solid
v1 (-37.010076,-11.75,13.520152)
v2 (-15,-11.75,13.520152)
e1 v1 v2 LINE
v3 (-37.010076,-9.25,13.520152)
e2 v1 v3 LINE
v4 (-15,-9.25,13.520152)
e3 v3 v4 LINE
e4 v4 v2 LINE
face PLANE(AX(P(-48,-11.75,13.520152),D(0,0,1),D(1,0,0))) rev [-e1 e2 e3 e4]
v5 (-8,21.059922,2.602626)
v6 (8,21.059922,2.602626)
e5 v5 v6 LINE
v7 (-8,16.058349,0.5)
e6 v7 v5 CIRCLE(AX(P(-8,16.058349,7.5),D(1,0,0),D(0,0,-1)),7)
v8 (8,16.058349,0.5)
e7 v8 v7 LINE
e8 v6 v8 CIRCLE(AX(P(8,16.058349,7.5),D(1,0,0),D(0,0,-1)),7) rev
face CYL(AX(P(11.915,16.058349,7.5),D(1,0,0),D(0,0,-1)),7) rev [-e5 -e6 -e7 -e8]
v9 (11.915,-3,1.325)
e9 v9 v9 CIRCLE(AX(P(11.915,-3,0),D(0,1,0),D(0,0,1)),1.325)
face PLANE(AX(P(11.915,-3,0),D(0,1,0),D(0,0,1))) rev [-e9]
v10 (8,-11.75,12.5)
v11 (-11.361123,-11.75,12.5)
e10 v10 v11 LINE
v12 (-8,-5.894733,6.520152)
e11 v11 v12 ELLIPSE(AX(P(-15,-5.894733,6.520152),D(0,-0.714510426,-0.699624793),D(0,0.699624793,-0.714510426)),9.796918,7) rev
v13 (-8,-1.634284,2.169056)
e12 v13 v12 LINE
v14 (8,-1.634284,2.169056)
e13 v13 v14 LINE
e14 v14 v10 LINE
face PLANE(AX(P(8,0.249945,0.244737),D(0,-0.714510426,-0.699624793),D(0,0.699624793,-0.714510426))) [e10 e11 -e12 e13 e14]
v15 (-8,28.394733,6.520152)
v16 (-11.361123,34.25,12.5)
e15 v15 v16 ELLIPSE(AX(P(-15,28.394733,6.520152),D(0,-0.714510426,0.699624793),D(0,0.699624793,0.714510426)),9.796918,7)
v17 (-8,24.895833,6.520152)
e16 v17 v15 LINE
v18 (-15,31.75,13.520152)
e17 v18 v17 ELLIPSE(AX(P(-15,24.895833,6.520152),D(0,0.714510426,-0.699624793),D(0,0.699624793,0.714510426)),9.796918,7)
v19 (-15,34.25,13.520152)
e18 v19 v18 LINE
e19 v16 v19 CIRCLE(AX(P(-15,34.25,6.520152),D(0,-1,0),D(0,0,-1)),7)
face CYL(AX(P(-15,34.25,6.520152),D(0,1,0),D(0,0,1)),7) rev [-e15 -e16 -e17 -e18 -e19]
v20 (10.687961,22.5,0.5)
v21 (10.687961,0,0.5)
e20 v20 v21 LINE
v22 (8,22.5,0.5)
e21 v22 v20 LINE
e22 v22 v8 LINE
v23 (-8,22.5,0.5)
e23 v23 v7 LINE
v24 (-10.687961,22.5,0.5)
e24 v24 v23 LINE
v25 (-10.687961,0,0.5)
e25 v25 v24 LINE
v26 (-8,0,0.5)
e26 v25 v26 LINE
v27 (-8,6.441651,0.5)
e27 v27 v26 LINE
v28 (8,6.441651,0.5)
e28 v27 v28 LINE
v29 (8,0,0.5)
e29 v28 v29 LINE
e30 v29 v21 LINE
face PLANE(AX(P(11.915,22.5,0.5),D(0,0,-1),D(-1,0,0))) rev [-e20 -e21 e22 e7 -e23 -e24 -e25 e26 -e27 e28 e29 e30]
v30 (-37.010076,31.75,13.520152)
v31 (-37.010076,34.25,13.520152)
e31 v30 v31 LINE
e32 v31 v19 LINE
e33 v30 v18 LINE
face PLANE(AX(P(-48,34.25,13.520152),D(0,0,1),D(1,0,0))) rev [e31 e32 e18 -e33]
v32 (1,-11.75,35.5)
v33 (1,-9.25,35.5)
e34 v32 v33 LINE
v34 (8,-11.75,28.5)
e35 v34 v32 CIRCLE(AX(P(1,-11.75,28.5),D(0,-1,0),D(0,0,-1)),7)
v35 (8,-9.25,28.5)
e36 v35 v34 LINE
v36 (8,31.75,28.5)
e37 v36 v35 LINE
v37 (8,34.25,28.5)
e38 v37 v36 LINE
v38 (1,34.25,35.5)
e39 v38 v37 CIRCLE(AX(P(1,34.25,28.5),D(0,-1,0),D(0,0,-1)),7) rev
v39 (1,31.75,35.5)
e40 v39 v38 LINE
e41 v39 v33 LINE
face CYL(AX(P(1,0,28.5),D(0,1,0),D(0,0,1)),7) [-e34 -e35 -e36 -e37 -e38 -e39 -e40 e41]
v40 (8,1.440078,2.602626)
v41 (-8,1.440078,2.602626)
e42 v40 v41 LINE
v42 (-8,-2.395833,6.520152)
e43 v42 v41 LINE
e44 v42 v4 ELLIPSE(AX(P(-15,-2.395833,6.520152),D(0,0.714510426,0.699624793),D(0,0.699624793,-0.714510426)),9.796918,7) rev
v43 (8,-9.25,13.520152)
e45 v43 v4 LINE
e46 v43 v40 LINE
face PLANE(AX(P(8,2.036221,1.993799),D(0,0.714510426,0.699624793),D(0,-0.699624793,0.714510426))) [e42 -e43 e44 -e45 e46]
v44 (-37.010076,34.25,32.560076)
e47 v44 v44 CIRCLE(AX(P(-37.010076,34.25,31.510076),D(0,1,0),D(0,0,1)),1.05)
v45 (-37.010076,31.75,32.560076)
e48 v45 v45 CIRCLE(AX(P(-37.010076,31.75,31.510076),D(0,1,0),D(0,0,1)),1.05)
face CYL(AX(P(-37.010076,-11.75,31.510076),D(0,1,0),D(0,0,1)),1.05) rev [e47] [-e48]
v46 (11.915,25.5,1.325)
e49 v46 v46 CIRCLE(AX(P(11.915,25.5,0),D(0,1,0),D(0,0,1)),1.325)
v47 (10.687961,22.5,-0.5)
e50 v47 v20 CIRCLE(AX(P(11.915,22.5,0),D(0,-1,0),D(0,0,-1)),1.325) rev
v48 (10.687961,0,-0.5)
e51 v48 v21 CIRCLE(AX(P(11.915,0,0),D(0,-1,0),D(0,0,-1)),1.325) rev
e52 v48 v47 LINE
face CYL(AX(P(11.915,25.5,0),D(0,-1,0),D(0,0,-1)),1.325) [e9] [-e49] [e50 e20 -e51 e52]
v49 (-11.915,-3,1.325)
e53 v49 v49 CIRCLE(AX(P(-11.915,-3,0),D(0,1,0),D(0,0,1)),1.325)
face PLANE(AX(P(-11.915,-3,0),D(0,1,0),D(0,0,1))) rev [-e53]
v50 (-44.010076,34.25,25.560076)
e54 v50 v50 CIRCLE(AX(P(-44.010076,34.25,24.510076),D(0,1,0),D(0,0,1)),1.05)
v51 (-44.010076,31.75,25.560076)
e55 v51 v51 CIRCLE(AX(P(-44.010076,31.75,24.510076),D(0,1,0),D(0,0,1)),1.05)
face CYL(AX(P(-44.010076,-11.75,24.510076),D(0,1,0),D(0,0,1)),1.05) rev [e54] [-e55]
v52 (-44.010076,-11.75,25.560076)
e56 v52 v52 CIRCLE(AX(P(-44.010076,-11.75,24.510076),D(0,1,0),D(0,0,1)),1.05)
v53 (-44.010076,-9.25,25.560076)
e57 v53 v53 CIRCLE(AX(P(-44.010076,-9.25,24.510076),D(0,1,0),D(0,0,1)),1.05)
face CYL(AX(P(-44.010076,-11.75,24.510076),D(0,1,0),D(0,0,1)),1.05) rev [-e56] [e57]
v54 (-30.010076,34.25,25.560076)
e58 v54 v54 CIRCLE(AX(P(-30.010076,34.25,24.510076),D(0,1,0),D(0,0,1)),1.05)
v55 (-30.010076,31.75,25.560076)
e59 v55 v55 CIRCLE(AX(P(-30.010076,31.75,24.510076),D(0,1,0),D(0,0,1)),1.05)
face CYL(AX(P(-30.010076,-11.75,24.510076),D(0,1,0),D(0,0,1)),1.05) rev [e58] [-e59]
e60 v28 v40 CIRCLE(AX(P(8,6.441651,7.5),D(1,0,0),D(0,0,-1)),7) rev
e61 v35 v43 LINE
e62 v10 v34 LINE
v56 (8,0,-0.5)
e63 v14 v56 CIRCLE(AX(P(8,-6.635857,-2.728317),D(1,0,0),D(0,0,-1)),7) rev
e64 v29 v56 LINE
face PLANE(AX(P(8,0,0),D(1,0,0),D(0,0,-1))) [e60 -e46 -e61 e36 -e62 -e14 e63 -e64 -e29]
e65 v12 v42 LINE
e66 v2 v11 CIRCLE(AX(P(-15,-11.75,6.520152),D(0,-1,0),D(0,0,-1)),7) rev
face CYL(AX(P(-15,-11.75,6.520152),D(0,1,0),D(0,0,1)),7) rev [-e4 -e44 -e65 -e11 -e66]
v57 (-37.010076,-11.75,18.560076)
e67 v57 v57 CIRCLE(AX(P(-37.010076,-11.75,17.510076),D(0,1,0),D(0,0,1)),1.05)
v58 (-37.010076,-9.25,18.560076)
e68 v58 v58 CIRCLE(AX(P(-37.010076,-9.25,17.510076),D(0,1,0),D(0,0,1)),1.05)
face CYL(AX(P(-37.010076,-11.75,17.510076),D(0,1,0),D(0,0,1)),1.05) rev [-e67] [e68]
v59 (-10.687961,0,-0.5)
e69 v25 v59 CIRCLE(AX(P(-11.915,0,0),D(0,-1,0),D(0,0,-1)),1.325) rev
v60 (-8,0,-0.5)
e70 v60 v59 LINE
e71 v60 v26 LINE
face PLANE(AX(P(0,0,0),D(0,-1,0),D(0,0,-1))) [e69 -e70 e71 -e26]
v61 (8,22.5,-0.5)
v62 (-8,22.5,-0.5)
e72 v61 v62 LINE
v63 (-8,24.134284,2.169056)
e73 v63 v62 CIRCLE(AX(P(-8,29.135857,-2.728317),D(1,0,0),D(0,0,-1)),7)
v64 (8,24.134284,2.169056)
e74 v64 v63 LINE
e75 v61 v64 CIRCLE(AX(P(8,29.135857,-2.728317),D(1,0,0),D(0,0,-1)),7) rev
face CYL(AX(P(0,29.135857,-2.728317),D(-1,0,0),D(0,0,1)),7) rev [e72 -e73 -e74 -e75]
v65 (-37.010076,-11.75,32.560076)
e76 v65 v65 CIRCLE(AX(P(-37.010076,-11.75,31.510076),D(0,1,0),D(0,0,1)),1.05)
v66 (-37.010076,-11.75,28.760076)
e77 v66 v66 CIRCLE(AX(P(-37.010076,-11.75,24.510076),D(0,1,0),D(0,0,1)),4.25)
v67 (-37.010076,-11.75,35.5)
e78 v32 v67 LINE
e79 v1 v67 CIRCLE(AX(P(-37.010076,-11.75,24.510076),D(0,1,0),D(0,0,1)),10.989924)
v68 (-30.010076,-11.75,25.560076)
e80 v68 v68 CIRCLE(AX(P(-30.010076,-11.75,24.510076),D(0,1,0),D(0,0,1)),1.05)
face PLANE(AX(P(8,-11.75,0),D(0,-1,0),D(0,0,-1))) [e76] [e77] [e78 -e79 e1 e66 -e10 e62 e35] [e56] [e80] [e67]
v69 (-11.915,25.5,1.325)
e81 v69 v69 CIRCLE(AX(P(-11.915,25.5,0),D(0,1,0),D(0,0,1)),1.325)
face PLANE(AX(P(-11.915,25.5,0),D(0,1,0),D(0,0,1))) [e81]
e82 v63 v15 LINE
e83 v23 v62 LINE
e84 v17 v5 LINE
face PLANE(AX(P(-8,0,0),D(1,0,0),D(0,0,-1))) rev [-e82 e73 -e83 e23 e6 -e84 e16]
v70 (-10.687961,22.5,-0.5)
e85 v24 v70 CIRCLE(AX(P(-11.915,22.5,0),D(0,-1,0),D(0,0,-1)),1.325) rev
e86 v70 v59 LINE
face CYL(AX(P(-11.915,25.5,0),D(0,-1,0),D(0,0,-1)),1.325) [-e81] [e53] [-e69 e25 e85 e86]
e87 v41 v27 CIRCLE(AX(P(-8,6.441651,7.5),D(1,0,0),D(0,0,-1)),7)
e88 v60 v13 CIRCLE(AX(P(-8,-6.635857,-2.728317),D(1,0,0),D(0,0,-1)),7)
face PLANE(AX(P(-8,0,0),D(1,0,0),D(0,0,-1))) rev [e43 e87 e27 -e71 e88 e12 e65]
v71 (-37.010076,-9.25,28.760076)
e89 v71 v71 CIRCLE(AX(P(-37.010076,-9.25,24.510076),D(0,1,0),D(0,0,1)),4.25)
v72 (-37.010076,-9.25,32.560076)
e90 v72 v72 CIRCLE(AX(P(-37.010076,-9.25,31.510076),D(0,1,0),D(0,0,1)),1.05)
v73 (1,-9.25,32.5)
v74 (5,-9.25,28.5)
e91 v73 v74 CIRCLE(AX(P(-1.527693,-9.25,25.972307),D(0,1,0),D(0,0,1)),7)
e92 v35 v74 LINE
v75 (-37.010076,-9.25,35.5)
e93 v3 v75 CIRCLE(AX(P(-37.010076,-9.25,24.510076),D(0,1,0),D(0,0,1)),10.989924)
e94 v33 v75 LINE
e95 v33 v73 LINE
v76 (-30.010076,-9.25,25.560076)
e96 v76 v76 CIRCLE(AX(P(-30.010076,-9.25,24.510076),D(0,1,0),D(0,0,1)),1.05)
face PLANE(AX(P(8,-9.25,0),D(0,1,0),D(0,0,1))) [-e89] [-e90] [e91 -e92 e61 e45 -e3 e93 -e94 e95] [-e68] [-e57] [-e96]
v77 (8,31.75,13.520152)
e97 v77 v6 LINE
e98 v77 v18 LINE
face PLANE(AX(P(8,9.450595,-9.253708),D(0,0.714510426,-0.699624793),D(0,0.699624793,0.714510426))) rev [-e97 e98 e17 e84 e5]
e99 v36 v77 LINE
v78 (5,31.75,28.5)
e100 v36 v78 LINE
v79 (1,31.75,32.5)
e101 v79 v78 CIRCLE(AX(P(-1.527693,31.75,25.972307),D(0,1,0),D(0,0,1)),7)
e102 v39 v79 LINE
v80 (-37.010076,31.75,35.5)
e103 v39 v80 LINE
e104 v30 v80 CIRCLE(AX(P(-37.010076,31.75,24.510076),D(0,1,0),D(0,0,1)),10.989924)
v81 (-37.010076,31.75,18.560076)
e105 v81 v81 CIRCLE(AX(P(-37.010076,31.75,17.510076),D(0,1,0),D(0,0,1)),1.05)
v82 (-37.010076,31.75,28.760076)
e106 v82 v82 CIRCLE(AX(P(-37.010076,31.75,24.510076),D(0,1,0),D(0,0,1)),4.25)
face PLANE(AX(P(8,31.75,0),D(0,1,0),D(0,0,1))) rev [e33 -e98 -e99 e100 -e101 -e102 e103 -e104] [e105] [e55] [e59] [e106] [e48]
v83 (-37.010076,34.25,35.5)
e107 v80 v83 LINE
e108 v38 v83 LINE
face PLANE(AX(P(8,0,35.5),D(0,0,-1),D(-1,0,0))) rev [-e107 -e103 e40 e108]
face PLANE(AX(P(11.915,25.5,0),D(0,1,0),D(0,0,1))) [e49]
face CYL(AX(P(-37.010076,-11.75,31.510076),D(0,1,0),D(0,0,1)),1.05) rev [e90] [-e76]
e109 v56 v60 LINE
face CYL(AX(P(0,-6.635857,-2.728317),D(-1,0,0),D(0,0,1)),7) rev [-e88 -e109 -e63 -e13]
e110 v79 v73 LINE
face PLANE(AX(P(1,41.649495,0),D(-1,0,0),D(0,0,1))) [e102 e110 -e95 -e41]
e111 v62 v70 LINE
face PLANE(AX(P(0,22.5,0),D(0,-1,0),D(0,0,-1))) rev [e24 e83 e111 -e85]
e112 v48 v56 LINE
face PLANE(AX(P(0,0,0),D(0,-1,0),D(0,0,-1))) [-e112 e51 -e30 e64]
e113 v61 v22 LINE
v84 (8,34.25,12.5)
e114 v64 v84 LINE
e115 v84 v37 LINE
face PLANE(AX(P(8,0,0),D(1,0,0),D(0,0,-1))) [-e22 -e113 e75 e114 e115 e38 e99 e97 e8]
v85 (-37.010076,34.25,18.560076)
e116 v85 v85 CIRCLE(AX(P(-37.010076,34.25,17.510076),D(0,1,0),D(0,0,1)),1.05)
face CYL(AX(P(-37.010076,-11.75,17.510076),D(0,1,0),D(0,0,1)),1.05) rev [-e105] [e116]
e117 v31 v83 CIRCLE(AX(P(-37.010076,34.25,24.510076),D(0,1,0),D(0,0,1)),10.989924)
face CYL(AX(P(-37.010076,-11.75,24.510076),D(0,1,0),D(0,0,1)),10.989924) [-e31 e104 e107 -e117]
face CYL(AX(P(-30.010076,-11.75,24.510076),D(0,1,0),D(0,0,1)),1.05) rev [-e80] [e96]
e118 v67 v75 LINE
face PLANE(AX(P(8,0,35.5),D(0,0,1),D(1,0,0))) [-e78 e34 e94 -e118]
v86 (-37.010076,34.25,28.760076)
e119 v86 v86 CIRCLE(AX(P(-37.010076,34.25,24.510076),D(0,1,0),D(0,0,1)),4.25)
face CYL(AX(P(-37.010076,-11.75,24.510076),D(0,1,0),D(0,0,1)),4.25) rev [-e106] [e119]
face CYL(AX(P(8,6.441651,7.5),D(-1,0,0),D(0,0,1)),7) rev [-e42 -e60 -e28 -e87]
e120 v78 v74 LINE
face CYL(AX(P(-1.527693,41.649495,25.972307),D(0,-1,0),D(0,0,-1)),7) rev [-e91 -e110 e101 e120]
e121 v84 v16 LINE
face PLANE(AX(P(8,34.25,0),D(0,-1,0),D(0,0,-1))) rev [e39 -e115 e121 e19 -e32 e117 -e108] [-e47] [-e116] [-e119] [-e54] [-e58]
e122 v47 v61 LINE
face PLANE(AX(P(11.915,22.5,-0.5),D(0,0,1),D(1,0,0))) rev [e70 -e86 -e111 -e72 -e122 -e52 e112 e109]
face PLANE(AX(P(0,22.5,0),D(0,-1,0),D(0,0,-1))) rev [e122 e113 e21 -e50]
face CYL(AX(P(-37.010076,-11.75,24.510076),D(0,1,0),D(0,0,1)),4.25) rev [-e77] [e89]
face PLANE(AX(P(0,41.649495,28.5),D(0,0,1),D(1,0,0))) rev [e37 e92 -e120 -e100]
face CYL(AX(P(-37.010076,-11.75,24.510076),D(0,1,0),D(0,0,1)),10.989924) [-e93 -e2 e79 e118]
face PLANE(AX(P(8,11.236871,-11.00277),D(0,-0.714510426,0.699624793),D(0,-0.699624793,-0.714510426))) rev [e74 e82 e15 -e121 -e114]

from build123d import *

# Parameters (mm, degrees)
SKETCH1_W           = 23.83
SKETCH1_H           = 1
BOSS_EXTRUDE1_DEPTH = 22.5
SKETCH2_R           = 1.325
BOSS_EXTRUDE2_DEPTH = 14.25
BOSS_EXTRUDE4_DEPTH = 8
SKETCH5_W           = 21.979847568
SKETCH5_H           = 2.5
BOSS_EXTRUDE5_DEPTH = 40
SKETCH6_R           = 4.25
SKETCH6_R_2         = 1.05
CUT_EXTRUDE1_DEPTH  = 76.367433285
FILLET1_R           = 7
FILLET2_R           = 7
FILLET3_R           = 7
BOSS_EXTRUDE6_START = 41
BOSS_EXTRUDE6_DEPTH = 41


with BuildPart() as part:
    # Sketch1 → Boss-Extrude1 (new body)
    with BuildSketch(Plane(origin=(0, 0, 0), x_dir=(1, 0, 0), z_dir=(0, 1, 0))):
        Rectangle(SKETCH1_W, SKETCH1_H)
    extrude(amount=BOSS_EXTRUDE1_DEPTH)

    # Sketch2 → Boss-Extrude2 (add, symmetric)
    with BuildSketch(Plane(origin=(0, 11.25, 0), x_dir=(1, 0, 0), z_dir=(0, 1, 0))):
        with Locations(Location((-11.915, 0, 0), (0, 0, 270))):
            Circle(SKETCH2_R)
        with Locations(Location((11.915, 0, 0), (0, 0, 270))):
            Circle(SKETCH2_R)
    extrude(amount=BOSS_EXTRUDE2_DEPTH, both=True)

    # Sketch4 → Boss-Extrude4 (add, symmetric)
    with BuildSketch(Plane(origin=(0, 0, 0), x_dir=(0, 0, -1), z_dir=(1, 0, 0))):
        Polygon((-0.5, 19.001100744), (-0.5, 22.5), (-12.5, 34.25), (-35.5, 34.25), (-35.5, 31.75), (-13.520152432, 31.75), align=None)
        Polygon((-0.5, 0), (-0.5, 3.498899256), (-13.520152432, -9.25), (-35.5, -9.25), (-35.5, -11.75), (-12.5, -11.75), align=None)
    extrude(amount=BOSS_EXTRUDE4_DEPTH, both=True)

    # Sketch5 → Boss-Extrude5 (add)
    with BuildSketch(Plane.ZY.offset(8)):
        with Locations((24.510076216, 33)):
            Rectangle(SKETCH5_W, SKETCH5_H)
        with Locations((24.510076216, -10.5)):
            Rectangle(SKETCH5_W, SKETCH5_H)
    extrude(amount=BOSS_EXTRUDE5_DEPTH)

    # Sketch6 → Cut-Extrude1 (cut, through all)
    with BuildSketch(Plane(origin=(0, 34.25, 0), x_dir=(1, 0, 0), z_dir=(0, 1, 0))):
        with Locations(Location((-37.010076216, -24.510076216, 0), (0, 0, 270))):
            Circle(SKETCH6_R)
        with Locations(Location((-44.010076216, -24.510076216, 0), (0, 0, 270))):
            Circle(SKETCH6_R_2)
        with Locations(Location((-37.010076216, -17.510076216, 0), (0, 0, 270))):
            Circle(SKETCH6_R_2)
        with Locations(Location((-30.010076216, -24.510076216, 0), (0, 0, 270))):
            Circle(SKETCH6_R_2)
        with Locations(Location((-37.010076216, -31.510076216, 0), (0, 0, 270))):
            Circle(SKETCH6_R_2)
        with BuildLine():
            ThreePointArc((-48, -24.510076216), (-44.781125848, -16.739026584), (-37.010076216, -13.520152432))
            Line((-37.010076216, -13.520152432), (-48, -13.520152432))
            Line((-48, -13.520152432), (-48, -24.510076216))
        make_face()
        with BuildLine():
            ThreePointArc((-37.010076216, -35.5), (-44.781125848, -32.281125848), (-48, -24.510076216))
            Line((-48, -24.510076216), (-48, -35.5))
            Line((-48, -35.5), (-37.010076216, -35.5))
        make_face()
    extrude(amount=-CUT_EXTRUDE1_DEPTH, mode=Mode.SUBTRACT)

    # Fillet1
    # the kernel refuses this fillet: 7 mm, written as the material it adds along each edge
    with BuildSketch(Plane(origin=(-8, -11.75, 13.520152432), x_dir=(-1, 0, 0), z_dir=(0, 1, 0))) as fillet1_piece_1_section:
        with BuildLine():
            CenterArc((FILLET1_R, -FILLET1_R), FILLET1_R, 90, 90)
            Line((0, -FILLET1_R), (0, 0))
            Line((0, 0), (FILLET1_R, 0))
        make_face()
    fillet1_piece_1 = extrude(amount=2.5, mode=Mode.PRIVATE)
    fillet1_piece_1 = split(fillet1_piece_1, bisect_by=Plane(origin=(-10.011124011, -11.168341556, 11.905965844), z_dir=(0, 0.7145104264934944, 0.699624792608213)), keep=Keep.TOP, mode=Mode.PRIVATE)
    fillet1_piece_1 = split(fillet1_piece_1, bisect_by=Plane(origin=(-10.011124011, -9.382065489, 13.655027826), z_dir=(0, -0.7145104264934944, -0.6996247926082129)), keep=Keep.TOP, mode=Mode.PRIVATE)
    add(fillet1_piece_1)
    with BuildSketch(Plane(origin=(-8, -11.75, 13.520152432), x_dir=(-1, 0, 0), z_dir=(0, 1, 0))) as fillet1_piece_2_section:
        with BuildLine():
            CenterArc((FILLET1_R, -FILLET1_R), FILLET1_R, 90, 90)
            Line((0, -FILLET1_R), (0, 0))
            Line((0, 0), (FILLET1_R, 0))
        make_face()
    fillet1_piece_2 = extrude(amount=20, mode=Mode.PRIVATE)
    fillet1_piece_2 = split(fillet1_piece_2, bisect_by=Plane(origin=(-8.808469458, -8.892227761, 9.581424097), z_dir=(0, 0.7145104264934944, 0.699624792608213)), keep=Keep.TOP, mode=Mode.PRIVATE)
    fillet1_piece_2 = split(fillet1_piece_2, bisect_by=Plane(origin=(-8.808469458, -9.25, 10.72673952), z_dir=(0, 1, 0)), keep=Keep.TOP, mode=Mode.PRIVATE)
    fillet1_piece_2 = split(fillet1_piece_2, bisect_by=Plane(origin=(-8.808469458, -7.105951695, 11.330486078), z_dir=(0, -0.7145104264934944, -0.6996247926082129)), keep=Keep.TOP, mode=Mode.PRIVATE)
    add(fillet1_piece_2)
    with BuildSketch(Plane(origin=(-8, 34.25, 13.520152432), x_dir=(0, 0, -1), z_dir=(0, -1, 0))) as fillet1_piece_3_section:
        with BuildLine():
            CenterArc((FILLET1_R, -FILLET1_R), FILLET1_R, 90, 90)
            Line((0, -FILLET1_R), (0, 0))
            Line((0, 0), (FILLET1_R, 0))
        make_face()
    fillet1_piece_3 = extrude(amount=2.5, mode=Mode.PRIVATE)
    fillet1_piece_3 = split(fillet1_piece_3, bisect_by=Plane(origin=(-10.011124011, 31.882065489, 13.655027826), z_dir=(0, 0.7145104264934944, -0.6996247926082129)), keep=Keep.TOP, mode=Mode.PRIVATE)
    fillet1_piece_3 = split(fillet1_piece_3, bisect_by=Plane(origin=(-10.011124011, 33.668341556, 11.905965844), z_dir=(0, -0.7145104264934944, 0.699624792608213)), keep=Keep.TOP, mode=Mode.PRIVATE)
    add(fillet1_piece_3)
    with BuildSketch(Plane(origin=(-8, 34.25, 13.520152432), x_dir=(0, 0, -1), z_dir=(0, -1, 0))) as fillet1_piece_4_section:
        with BuildLine():
            CenterArc((FILLET1_R, -FILLET1_R), FILLET1_R, 90, 90)
            Line((0, -FILLET1_R), (0, 0))
            Line((0, 0), (FILLET1_R, 0))
        make_face()
    fillet1_piece_4 = extrude(amount=20, mode=Mode.PRIVATE)
    fillet1_piece_4 = split(fillet1_piece_4, bisect_by=Plane(origin=(-8.808469465, 29.605951697, 11.33048608), z_dir=(0, 0.7145104264934944, -0.6996247926082129)), keep=Keep.TOP, mode=Mode.PRIVATE)
    fillet1_piece_4 = split(fillet1_piece_4, bisect_by=Plane(origin=(-8.808469465, 31.392227764, 9.581424099), z_dir=(0, -0.7145104264934944, 0.699624792608213)), keep=Keep.TOP, mode=Mode.PRIVATE)
    fillet1_piece_4 = split(fillet1_piece_4, bisect_by=Plane(origin=(-8.808469465, 31.75, 10.726739522), z_dir=(0, -1, 0)), keep=Keep.TOP, mode=Mode.PRIVATE)
    add(fillet1_piece_4)
    # the kernel refuses this fillet: 7 mm, written as the material it takes off along each edge
    with BuildSketch(Plane(origin=(8, 8.25, 35.5), x_dir=(0, 0, -1), z_dir=(0, -1, 0))) as fillet1_2_piece_1:
        with BuildLine():
            CenterArc((FILLET1_R, -FILLET1_R), FILLET1_R, 90, 90)
            Line((0, -FILLET1_R), (0, 0))
            Line((0, 0), (FILLET1_R, 0))
        make_face()
    extrude(amount=37.5, mode=Mode.SUBTRACT)
    with BuildSketch(Plane(origin=(8, 51.75, 35.5), x_dir=(-1, 0, 0), z_dir=(0, -1, 0))) as fillet1_2_piece_2:
        with BuildLine():
            CenterArc((FILLET1_R, FILLET1_R), FILLET1_R, 180, 90)
            Line((0, FILLET1_R), (0, 0))
            Line((0, 0), (FILLET1_R, 0))
        make_face()
    extrude(amount=37.5, mode=Mode.SUBTRACT)

    # Fillet2
    fillet2_edges = [part.edges().sort_by_distance(p)[0] for p in [
        (0, 19.001100744, 0.5),
        (0, 3.498899256, 0.5),
    ]]
    fillet(fillet2_edges, radius=FILLET2_R)

    # Fillet3
    # the kernel refuses this fillet: 7 mm, written as the material it adds along each edge
    with BuildSketch(Plane(origin=(-8, 22.5, 0.5), x_dir=(0, 0.6996247926074847, 0.7145104264942074), z_dir=(1, 0, 0))) as fillet3_piece_1:
        with BuildLine():
            CenterArc((2.335944006, -7), FILLET3_R, 90, 25.834886249)
            Line((-0.714510426, -0.699624793), (0, 0))
            Line((0, 0), (2.335944006, 0))
        make_face()
    extrude(amount=16)
    with BuildSketch(Plane(origin=(8, 0, 0.5), x_dir=(0, 0, -1), z_dir=(-1, 0, 0))) as fillet3_piece_2:
        with BuildLine():
            CenterArc((3.2283172, 6.635857326), FILLET3_R, 225.603091194, 25.834886249)
            Line((-1.669056348, 1.634284341), (0, 0))
            Line((0, 0), (1, 0))
        make_face()
    extrude(amount=16)

    # Sketch8 → Boss-Extrude6 (add)
    with BuildSketch(Plane(origin=(0, -9.25, 0), x_dir=(1, 0, 0), z_dir=(0, 1, 0)).offset(BOSS_EXTRUDE6_START)):
        with BuildLine():
            ThreePointArc((1, -35.5), (5.949747468, -33.449747468), (8, -28.5))
            Line((8, -28.5), (5, -28.5))
            ThreePointArc((5, -28.5), (3.422054899, -30.922054899), (1, -32.5))
            Line((1, -32.5), (1, -35.5))
        make_face()
    extrude(amount=-BOSS_EXTRUDE6_DEPTH)


solid = part.part
